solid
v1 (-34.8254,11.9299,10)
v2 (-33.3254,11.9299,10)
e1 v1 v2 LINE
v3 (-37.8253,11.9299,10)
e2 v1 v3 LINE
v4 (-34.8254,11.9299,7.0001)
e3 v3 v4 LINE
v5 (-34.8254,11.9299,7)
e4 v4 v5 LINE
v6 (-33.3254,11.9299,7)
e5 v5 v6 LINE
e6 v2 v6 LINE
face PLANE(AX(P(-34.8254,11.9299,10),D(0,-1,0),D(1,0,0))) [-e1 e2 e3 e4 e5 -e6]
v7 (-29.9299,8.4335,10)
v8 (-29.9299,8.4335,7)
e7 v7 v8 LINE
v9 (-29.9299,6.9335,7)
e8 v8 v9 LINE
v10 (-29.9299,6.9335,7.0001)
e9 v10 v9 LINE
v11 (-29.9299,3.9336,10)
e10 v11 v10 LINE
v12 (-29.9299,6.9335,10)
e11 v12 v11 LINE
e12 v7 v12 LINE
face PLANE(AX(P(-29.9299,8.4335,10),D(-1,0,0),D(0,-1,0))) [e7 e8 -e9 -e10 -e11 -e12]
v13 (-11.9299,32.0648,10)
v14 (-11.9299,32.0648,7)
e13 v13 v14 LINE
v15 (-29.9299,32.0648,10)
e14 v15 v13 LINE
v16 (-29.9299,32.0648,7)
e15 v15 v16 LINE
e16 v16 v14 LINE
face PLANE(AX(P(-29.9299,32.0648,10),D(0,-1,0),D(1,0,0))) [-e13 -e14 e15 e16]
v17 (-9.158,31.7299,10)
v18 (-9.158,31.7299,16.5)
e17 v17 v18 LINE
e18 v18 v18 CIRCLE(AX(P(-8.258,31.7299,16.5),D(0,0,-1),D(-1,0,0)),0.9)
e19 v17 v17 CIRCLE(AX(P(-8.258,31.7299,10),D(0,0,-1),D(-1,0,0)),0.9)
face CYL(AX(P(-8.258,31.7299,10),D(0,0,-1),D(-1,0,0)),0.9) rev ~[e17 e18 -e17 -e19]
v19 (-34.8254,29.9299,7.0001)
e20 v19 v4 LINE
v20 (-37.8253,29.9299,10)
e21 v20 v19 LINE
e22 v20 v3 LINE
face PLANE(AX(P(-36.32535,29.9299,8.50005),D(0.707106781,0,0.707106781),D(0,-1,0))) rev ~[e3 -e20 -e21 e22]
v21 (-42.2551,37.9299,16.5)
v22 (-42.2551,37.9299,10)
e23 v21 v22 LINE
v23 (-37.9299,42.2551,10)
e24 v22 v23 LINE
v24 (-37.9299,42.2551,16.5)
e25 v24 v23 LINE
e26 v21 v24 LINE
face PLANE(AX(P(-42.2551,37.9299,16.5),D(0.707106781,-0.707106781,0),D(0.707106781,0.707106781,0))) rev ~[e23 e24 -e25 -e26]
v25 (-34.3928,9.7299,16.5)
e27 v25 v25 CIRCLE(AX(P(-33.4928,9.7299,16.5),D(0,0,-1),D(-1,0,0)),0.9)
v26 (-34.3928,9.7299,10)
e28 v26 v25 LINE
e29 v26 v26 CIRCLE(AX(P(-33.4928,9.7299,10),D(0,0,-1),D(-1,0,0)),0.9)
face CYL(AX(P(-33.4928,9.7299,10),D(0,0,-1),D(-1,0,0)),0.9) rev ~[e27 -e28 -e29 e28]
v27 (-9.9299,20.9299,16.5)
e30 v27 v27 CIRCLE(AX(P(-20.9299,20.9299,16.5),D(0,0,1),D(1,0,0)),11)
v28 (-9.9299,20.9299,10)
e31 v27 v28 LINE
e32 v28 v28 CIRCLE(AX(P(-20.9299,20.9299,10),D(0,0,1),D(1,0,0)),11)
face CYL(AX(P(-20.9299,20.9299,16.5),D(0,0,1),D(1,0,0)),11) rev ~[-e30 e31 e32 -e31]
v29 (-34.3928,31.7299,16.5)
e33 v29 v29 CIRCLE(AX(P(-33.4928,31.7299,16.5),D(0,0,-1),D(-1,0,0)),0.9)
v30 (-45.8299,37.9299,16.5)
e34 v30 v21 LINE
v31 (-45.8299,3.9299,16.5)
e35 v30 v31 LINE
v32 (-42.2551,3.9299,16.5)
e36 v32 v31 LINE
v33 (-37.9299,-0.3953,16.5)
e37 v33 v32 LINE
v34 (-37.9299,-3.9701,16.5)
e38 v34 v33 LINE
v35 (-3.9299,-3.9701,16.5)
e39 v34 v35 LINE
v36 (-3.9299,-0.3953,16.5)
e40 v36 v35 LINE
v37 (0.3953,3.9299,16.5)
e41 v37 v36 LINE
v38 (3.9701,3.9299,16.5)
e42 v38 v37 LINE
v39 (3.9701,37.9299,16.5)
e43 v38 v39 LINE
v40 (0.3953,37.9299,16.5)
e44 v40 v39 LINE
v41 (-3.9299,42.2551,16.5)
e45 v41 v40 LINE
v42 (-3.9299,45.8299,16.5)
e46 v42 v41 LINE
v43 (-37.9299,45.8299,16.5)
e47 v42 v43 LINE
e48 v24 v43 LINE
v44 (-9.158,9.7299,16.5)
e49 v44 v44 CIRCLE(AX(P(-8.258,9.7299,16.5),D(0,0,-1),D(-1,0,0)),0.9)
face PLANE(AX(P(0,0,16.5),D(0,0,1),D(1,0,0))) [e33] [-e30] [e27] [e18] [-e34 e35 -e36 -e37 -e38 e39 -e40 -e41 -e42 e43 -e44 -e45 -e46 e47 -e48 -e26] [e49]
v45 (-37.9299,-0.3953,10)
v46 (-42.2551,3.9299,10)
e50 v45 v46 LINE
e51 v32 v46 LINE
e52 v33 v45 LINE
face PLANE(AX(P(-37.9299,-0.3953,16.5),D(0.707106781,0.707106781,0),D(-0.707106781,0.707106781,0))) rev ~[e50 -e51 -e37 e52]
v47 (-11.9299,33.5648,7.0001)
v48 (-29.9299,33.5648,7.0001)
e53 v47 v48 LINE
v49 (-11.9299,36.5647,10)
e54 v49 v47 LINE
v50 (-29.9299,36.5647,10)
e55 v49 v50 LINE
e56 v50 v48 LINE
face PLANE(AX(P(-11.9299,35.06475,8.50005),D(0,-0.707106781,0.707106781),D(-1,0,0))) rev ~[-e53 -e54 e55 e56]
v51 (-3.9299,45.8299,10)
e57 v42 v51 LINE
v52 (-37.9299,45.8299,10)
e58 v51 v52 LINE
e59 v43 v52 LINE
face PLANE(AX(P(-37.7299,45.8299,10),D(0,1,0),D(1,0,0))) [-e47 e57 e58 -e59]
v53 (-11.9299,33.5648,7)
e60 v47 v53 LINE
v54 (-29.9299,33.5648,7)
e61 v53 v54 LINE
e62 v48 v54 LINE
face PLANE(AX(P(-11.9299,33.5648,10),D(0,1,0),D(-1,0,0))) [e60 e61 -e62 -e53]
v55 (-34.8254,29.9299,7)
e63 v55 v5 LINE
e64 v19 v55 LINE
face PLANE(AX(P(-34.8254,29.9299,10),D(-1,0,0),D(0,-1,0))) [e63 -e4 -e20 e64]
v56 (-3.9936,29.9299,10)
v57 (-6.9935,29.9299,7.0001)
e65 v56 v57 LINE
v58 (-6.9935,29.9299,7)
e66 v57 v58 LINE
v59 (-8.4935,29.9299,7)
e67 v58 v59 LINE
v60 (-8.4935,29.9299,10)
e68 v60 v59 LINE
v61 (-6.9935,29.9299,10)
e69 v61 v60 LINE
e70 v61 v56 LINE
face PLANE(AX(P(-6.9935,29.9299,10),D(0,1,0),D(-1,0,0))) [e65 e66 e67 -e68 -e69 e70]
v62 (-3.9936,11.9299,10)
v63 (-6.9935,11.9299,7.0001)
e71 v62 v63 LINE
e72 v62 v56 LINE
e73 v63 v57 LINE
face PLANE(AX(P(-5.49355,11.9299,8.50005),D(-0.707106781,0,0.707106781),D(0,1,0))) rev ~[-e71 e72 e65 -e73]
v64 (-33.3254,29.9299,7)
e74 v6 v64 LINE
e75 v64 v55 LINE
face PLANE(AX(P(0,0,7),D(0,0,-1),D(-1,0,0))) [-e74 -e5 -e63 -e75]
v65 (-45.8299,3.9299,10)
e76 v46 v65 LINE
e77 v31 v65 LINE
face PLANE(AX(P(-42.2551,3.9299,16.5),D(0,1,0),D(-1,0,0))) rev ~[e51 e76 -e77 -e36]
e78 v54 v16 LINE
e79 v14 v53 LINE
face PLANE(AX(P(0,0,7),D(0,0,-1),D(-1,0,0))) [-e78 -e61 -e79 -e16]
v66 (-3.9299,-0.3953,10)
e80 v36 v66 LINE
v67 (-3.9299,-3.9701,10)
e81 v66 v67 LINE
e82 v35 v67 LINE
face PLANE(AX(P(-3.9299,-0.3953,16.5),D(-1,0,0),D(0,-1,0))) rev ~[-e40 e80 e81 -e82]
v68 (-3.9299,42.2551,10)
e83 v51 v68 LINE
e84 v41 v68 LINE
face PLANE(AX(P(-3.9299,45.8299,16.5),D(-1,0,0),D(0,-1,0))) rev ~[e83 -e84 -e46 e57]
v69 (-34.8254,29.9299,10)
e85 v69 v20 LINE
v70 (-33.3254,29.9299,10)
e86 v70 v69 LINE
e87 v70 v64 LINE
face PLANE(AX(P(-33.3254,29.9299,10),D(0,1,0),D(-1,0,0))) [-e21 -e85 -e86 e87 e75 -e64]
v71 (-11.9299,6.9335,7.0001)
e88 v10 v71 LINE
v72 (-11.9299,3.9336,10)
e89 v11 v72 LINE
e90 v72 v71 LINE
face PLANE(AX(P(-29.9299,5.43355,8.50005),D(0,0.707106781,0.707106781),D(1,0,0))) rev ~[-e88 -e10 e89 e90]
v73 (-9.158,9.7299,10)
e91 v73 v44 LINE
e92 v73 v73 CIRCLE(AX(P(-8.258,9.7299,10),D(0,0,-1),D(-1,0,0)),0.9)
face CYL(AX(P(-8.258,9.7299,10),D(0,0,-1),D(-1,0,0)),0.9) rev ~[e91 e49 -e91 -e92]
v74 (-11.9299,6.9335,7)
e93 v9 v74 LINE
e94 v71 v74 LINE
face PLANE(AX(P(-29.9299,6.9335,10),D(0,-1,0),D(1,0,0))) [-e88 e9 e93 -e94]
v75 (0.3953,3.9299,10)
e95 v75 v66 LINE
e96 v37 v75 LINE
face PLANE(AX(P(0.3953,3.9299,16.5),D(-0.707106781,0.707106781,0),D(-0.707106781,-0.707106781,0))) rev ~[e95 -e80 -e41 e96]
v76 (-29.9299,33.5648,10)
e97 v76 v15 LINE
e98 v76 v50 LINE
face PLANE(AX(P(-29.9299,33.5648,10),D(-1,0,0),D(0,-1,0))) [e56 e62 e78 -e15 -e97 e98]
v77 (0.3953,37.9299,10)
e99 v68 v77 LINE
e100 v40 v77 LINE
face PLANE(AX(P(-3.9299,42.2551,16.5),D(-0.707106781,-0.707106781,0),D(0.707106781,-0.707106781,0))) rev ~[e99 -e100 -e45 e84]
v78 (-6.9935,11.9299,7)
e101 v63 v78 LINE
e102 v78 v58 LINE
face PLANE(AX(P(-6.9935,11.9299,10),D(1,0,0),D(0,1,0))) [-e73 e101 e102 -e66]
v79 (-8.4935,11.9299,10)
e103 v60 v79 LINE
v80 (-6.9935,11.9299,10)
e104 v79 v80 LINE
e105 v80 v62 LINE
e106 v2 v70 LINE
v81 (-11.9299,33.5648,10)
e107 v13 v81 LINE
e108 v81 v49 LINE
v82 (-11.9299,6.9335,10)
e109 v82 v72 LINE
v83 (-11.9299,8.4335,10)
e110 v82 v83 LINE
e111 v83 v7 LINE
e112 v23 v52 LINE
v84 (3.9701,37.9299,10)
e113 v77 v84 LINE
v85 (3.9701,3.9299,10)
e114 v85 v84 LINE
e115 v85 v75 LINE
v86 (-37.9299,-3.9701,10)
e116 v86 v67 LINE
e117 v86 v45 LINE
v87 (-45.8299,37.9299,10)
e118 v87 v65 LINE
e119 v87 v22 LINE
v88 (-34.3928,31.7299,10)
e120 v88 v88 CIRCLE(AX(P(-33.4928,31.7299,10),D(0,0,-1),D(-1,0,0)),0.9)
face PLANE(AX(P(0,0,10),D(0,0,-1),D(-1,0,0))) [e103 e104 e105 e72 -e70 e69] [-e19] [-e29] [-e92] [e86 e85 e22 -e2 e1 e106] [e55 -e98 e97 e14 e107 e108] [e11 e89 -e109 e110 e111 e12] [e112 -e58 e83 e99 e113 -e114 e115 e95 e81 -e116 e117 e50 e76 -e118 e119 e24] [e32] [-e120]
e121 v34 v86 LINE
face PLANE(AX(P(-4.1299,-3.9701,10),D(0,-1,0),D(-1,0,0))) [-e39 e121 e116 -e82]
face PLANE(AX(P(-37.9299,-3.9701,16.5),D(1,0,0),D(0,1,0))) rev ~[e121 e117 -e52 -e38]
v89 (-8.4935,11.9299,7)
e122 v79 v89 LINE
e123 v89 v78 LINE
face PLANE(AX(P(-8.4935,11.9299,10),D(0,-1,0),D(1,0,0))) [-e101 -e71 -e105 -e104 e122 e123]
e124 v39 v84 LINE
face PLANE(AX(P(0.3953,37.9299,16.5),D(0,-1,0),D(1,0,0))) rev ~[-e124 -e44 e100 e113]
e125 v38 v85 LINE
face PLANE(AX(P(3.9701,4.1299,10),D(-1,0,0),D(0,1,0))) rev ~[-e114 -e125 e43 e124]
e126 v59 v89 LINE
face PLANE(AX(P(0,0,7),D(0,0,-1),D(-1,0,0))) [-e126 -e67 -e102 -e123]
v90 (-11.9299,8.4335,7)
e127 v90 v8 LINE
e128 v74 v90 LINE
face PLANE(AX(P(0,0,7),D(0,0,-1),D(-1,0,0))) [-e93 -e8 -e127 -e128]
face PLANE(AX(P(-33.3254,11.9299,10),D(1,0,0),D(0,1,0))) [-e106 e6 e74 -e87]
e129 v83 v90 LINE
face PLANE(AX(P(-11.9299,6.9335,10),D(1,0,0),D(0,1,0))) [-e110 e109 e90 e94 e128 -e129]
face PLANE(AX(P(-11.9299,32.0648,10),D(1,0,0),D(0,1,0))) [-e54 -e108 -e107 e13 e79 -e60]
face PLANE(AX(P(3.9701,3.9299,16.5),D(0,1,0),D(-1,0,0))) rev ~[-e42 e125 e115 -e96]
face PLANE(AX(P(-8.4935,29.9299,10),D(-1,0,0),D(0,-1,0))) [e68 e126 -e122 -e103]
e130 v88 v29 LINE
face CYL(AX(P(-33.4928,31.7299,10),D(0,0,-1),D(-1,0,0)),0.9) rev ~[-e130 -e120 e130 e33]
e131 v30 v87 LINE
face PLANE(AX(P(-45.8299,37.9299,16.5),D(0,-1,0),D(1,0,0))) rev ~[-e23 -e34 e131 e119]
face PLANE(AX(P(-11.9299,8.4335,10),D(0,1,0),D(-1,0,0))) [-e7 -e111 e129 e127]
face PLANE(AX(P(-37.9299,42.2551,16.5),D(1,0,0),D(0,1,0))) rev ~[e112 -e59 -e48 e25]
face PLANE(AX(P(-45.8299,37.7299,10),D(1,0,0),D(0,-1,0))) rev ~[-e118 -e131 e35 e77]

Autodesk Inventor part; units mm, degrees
ref_plane "YZ Plane" through (0, 0, 0) normal (1, 0, 0) x (0, 1, 0)
ref_plane "Work Plane1" through (0, 0, 10) normal (0, 0, 1) x (1, 0, 0)
sketch "Sketch1" plane through (0, 0, 10) normal (0, 0, 1) x (1, 0, 0)
  line L0 (-4.0299, -0.3538) -> (-2.2322, 1.4439) construction
  arc A0 (-1.4439, 2.2322) -> (-2.2322, 1.4439) centre (-0.9299, 0.9299) ccw construction
  line L1 (-1.4439, 2.2322) -> (0.3538, 4.0299) construction
  line L2 (-37.8299, 42.2137) -> (-37.8299, 45.8299) construction
  line L3 (-37.8299, 45.8299) -> (-4.0299, 45.8299) construction
  line L4 (-4.0299, 45.8299) -> (-4.0299, 42.2137) construction
  line L5 (-4.0299, 4.0299) -> (0.3538, 4.0299) projected
  line L6 (-20.9299, 58.9723) -> (17.1124, 20.9299) construction
  line L7 (17.1124, 20.9299) -> (-20.9299, -17.1124) construction
  line L8 (-20.9299, -17.1124) -> (-58.9723, 20.9299) construction
  line L9 (-58.9723, 20.9299) -> (-20.9299, 58.9723) construction
  line L10 (-20.9299, 58.9723) -> (-20.9299, -17.1124) construction
  line L11 (17.1124, 20.9299) -> (-58.9723, 20.9299) construction
  line L12 (-20.9299, 58.9723) -> (32.8701, 58.9723) construction
  line L13 (-43.4299, 43.4299) -> (1.5701, 43.4299) construction
  line L14 (1.5701, 43.4299) -> (1.5701, -1.5701) construction
  line L15 (1.5701, -1.5701) -> (-43.4299, -1.5701) construction
  line L16 (-43.4299, -1.5701) -> (-43.4299, 43.4299) construction
  line L17 (-43.4299, 43.4299) -> (1.5701, -1.5701) construction
  line L18 (1.5701, 43.4299) -> (-43.4299, -1.5701) construction
  line L19 (-43.4299, 5.3876) -> (-43.4299, 36.4723)
  line L20 (-43.4299, 36.4723) -> (-36.4723, 43.4299)
  line L21 (-36.4723, 43.4299) -> (-5.3876, 43.4299)
  line L22 (-5.3876, 43.4299) -> (1.5701, 36.4723)
  line L23 (1.5701, 36.4723) -> (1.5701, 5.3876)
  line L24 (1.5701, 5.3876) -> (-5.3876, -1.5701)
  line L25 (-5.3876, -1.5701) -> (-36.4723, -1.5701)
  line L26 (-36.4723, -1.5701) -> (-43.4299, 5.3876)
  line L27 (-4.0299, 42.2137) -> (-37.8299, 42.2137) projected
  line L28 (-4.0299, -0.3538) -> (-4.0299, 4.0299) projected
  circle A1 centre (-20.9299, 20.9299) radius 13.3985
  circle A2 centre (-20.9299, 20.9299) radius 15.4895
  point P0 (-37.8299, 4.0299)
  dimension "d18" = 53.8
  dimension "d19" = 45
  dimension "d20" = 53.8
  dimension "d21" = 45
  dimension "d22" = 45
  dimension "d30" = 26.797
  dimension "d36" = 30.979
extrude "Extrusion1" add sketch "Sketch1" along normal blind 6.5 contours L28 L24 L25 L26 L19 L20 L27 L22 L23 L5 | L5 L24 L28 | L27 L20 L21 L22 | A1 | A2
ref_plane "Work Plane2" through (-40.9959, 0.8639, 22.2359) normal (0, 0, 1) x (1, 0, 0)
sketch "Sketch3" plane through (0, 0, 10) normal (0, 0, -1) x (-1, 0, 0)
  line L0 (37.8299, -0.4701) -> (37.8299, 4.0299) construction
  line L1 (4.0299, 4.0299) -> (4.0299, -0.4701) construction
  line L2 (37.8299, -0.4701) -> (37.8299, 1.1886) construction
  line L3 (4.0299, -3.9701) -> (4.0299, -0.3538) construction
  line L4 (45.8299, 4.0299) -> (42.2137, 4.0299) construction
  line L5 (-0.3538, 4.0299) -> (-3.9701, 4.0299) construction
  line L6 (-3.9701, 37.8299) -> (-0.3538, 37.8299) construction
  line L7 (4.0299, 42.2137) -> (4.0299, 45.8299) construction
  line L8 (37.8299, 45.8299) -> (37.8299, 42.2137) construction
  line L9 (42.2137, 37.8299) -> (45.8299, 37.8299) construction
  line L10 (37.8299, 37.7299) -> (45.8299, 37.7299)
  line L11 (45.8299, 37.7299) -> (45.8299, 4.1299)
  line L12 (45.8299, 4.1299) -> (37.8299, 4.1299)
  line L13 (37.8299, 4.1299) -> (37.8299, 37.7299)
  line L14 (37.7299, 4.0299) -> (4.1299, 4.0299)
  line L15 (4.1299, 4.0299) -> (4.1299, -3.9701)
  line L16 (4.1299, -3.9701) -> (37.7299, -3.9701)
  line L17 (37.7299, -3.9701) -> (37.7299, 4.0299)
  line L18 (4.0299, 4.1299) -> (-3.9701, 4.1299)
  line L19 (-3.9701, 4.1299) -> (-3.9701, 37.7299)
  line L20 (-3.9701, 37.7299) -> (4.0299, 37.7299)
  line L21 (4.0299, 37.7299) -> (4.0299, 4.1299)
  line L22 (4.1299, 37.8299) -> (37.7299, 37.8299)
  line L23 (37.7299, 37.8299) -> (37.7299, 45.8299)
  line L24 (37.7299, 45.8299) -> (4.1299, 45.8299)
  line L25 (4.1299, 45.8299) -> (4.1299, 37.8299)
  point P0 (0, 0)
  dimension "d23" = 0.1
  dimension "d24" = 0.1
  dimension "d25" = 0.1
  dimension "d26" = 0.1
  dimension "d27" = 0.1
extrude "Extrusion3" add sketch "Sketch3" against normal up to surface (6.5 mm away)
sketch "Sketch6" plane through (0, 0, 16.5) normal (0, 0, 1) x (1, 0, 0)
  circle A0 centre (-20.9299, 20.9299) radius 15.4895
  circle A1 centre (-20.9299, 20.9299) radius 11
  line L0 (-45.8299, 4.1299) -> (-45.8299, 37.7299) projected
  line L1 (-4.1299, -3.9701) -> (-37.7299, -3.9701) projected
  line L2 (-37.7299, 45.8299) -> (-4.1299, 45.8299) projected
  point P0 (0, 0)
  point P1 (-45.8299, 20.9299)
  point P2 (-20.9299, -3.9701)
  point P3 (-20.9299, 45.8299)
  dimension "d37" = 22
  dimension "d38" = 30.979
extrude "Extrusion5" cut sketch "Sketch6" against normal blind 12 contours A1
sketch "Skizze12" plane through (0, 0, 16.5) normal (0, 0, 1) x (1, 0, 0)
  circle A0 centre (-20.9299, 20.9299) radius 11 construction
  line L0 (3.9701, 4.1299) -> (0.3124, 4.1299) projected
  line L1 (3.9701, 37.7299) -> (3.9701, 4.1299) construction
  line L2 (0.3124, 37.7299) -> (3.9701, 37.7299) projected
  line L3 (0.3124, 37.7299) -> (-4.1299, 42.1723) projected
  line L4 (-4.1299, 45.8299) -> (-4.1299, 42.1723) projected
  line L5 (-37.7299, 45.8299) -> (-4.1299, 45.8299) construction
  line L6 (-37.7299, 42.1723) -> (-37.7299, 45.8299) projected
  line L7 (-37.7299, 42.1723) -> (-42.1723, 37.7299) projected
  line L8 (-45.8299, 37.7299) -> (-42.1723, 37.7299) projected
  line L9 (-45.8299, 4.1299) -> (-45.8299, 37.7299) construction
  line L10 (-42.1723, 4.1299) -> (-45.8299, 4.1299) projected
  line L11 (-42.1723, 4.1299) -> (-37.7299, -0.3124) projected
  line L12 (-37.7299, -3.9701) -> (-37.7299, -0.3124) projected
  line L13 (-4.1299, -3.9701) -> (-37.7299, -3.9701) construction
  line L14 (-4.1299, -0.3124) -> (-4.1299, -3.9701) projected
  line L15 (-4.1299, -0.3124) -> (0.3124, 4.1299) projected
  line L16 (-3.9299, 46.0299) -> (-3.9299, 42.2551)
  line L17 (-3.9299, 42.2551) -> (0.3953, 37.9299)
  line L18 (0.3953, 37.9299) -> (4.1701, 37.9299)
  line L19 (4.1701, 37.9299) -> (4.1701, 3.9299) construction
  line L20 (4.1701, 3.9299) -> (0.3953, 3.9299)
  line L21 (0.3953, 3.9299) -> (-3.9299, -0.3953)
  line L22 (-3.9299, -0.3953) -> (-3.9299, -4.1701)
  line L23 (-3.9299, -4.1701) -> (-37.9299, -4.1701) construction
  line L24 (-37.9299, -4.1701) -> (-37.9299, -0.3953)
  line L25 (-37.9299, -0.3953) -> (-42.2551, 3.9299)
  line L26 (-42.2551, 3.9299) -> (-46.0299, 3.9299)
  line L27 (-46.0299, 3.9299) -> (-46.0299, 37.9299) construction
  line L28 (-46.0299, 37.9299) -> (-42.2551, 37.9299)
  line L29 (-42.2551, 37.9299) -> (-37.9299, 42.2551)
  line L30 (-37.9299, 42.2551) -> (-37.9299, 46.0299)
  line L31 (-37.9299, 46.0299) -> (-3.9299, 46.0299) construction
  line L32 (-45.8299, 37.7299) -> (-45.8299, 37.9299)
  line L33 (-37.7299, 45.8299) -> (-37.9299, 45.8299)
  line L34 (-4.1299, 45.8299) -> (-3.9299, 45.8299)
  line L35 (3.9701, 37.7299) -> (3.9701, 37.9299)
  line L36 (3.9701, 4.1299) -> (0.3124, 4.1299) projected
  line L37 (3.9701, 4.1299) -> (3.9701, 3.9299)
  line L38 (-4.1299, -3.9701) -> (-3.9299, -3.9701)
  line L39 (-37.7299, -3.9701) -> (-37.9299, -3.9701)
  line L40 (-45.8299, 4.1299) -> (-45.8299, 3.9299)
  point P0 (0, 0)
  dimension "d93" = 0.2
extrude "IM_offset" add sketch "Skizze12" against normal up to surface (6.5 mm away)
sketch "Sketch13" plane through (0, 0, 10) normal (0, 0, -1) x (-1, 0, 0)
  arc A0 (8.6799, 30.7299) -> (8.6799, 32.7299) centre (8.6799, 31.7299) ccw projected
  arc A1 (33.1799, 32.7299) -> (33.1799, 30.7299) centre (33.1799, 31.7299) ccw projected
  arc A2 (33.1799, 10.7299) -> (33.1799, 8.7299) centre (33.1799, 9.7299) ccw projected
  arc A3 (8.6799, 8.7299) -> (8.6799, 10.7299) centre (8.6799, 9.7299) ccw projected
  circle A4 centre (8.258, 9.7299) radius 0.9
  circle A5 centre (8.258, 31.7299) radius 0.9
  circle A6 centre (33.4928, 31.7299) radius 0.9
  circle A7 centre (33.4928, 9.7299) radius 0.9
  point P0 (0, 0)
  dimension "d96" = 1.8
  dimension "d97" = 1.8
  dimension "d98" = 1.8
  dimension "d99" = 1.8
extrude "Extrusion9" cut sketch "Sketch13" against normal blind 10
sketch "Sketch14" plane through (0, 0, 10) normal (0, 0, -1) x (-1, 0, 0)
  circle A0 centre (20.9299, 20.9299) radius 11 projected
  line L0 (29.9299, 32.0648) -> (11.9299, 32.0648)
  line L1 (11.9299, 32.0648) -> (11.9299, 33.5648)
  line L2 (11.9299, 33.5648) -> (29.9299, 33.5648)
  line L3 (29.9299, 33.5648) -> (29.9299, 32.0648)
  line L4 (29.9299, 32.0648) -> (11.9299, 33.5648) construction
  line L5 (11.9299, 32.0648) -> (29.9299, 33.5648) construction
  line L6 (29.9299, 6.9335) -> (11.9299, 6.9335)
  line L7 (11.9299, 6.9335) -> (11.9299, 8.4335)
  line L8 (11.9299, 8.4335) -> (29.9299, 8.4335)
  line L9 (29.9299, 8.4335) -> (29.9299, 6.9335)
  line L10 (29.9299, 6.9335) -> (11.9299, 8.4335) construction
  line L11 (11.9299, 6.9335) -> (29.9299, 8.4335) construction
  line L12 (6.9935, 29.9299) -> (8.4935, 29.9299)
  line L13 (8.4935, 29.9299) -> (8.4935, 11.9299)
  line L14 (8.4935, 11.9299) -> (6.9935, 11.9299)
  line L15 (6.9935, 11.9299) -> (6.9935, 29.9299)
  line L16 (6.9935, 29.9299) -> (8.4935, 11.9299) construction
  line L17 (8.4935, 29.9299) -> (6.9935, 11.9299) construction
  line L18 (33.3254, 29.9299) -> (34.8254, 29.9299)
  line L19 (34.8254, 29.9299) -> (34.8254, 11.9299)
  line L20 (34.8254, 11.9299) -> (33.3254, 11.9299)
  line L21 (33.3254, 11.9299) -> (33.3254, 29.9299)
  line L22 (33.3254, 29.9299) -> (34.8254, 11.9299) construction
  line L23 (34.8254, 29.9299) -> (33.3254, 11.9299) construction
  point P0 (0, 0)
  point P1 (20.9299, 32.8148)
  point P2 (20.9299, 7.6835)
  point P3 (7.7435, 20.9299)
  point P4 (34.0754, 20.9299)
  dimension "d102" = 18
  dimension "d103" = 1.5
  dimension "d104" = 1.5
  dimension "d105" = 1.5
  dimension "d106" = 18
  dimension "d107" = 1.5
  dimension "d108" = 18
extrude "Extrusion10" add sketch "Sketch14" along normal blind 3 contours L0 L1 L2 L3 | L6 L7 L8 L9 | L12 L13 L14 L15 | L18 L19 L20 L21
chamfer "Chamfer1" distance 3 angle 45 4 edges at (-20.9299, 6.9335, 10) (-6.9935, 20.9299, 10) (-20.9299, 33.5648, 10) (-34.8254, 20.9299, 10)
properties part number "20_Cube_Insert_Laser_Holder_fixed_v3"
